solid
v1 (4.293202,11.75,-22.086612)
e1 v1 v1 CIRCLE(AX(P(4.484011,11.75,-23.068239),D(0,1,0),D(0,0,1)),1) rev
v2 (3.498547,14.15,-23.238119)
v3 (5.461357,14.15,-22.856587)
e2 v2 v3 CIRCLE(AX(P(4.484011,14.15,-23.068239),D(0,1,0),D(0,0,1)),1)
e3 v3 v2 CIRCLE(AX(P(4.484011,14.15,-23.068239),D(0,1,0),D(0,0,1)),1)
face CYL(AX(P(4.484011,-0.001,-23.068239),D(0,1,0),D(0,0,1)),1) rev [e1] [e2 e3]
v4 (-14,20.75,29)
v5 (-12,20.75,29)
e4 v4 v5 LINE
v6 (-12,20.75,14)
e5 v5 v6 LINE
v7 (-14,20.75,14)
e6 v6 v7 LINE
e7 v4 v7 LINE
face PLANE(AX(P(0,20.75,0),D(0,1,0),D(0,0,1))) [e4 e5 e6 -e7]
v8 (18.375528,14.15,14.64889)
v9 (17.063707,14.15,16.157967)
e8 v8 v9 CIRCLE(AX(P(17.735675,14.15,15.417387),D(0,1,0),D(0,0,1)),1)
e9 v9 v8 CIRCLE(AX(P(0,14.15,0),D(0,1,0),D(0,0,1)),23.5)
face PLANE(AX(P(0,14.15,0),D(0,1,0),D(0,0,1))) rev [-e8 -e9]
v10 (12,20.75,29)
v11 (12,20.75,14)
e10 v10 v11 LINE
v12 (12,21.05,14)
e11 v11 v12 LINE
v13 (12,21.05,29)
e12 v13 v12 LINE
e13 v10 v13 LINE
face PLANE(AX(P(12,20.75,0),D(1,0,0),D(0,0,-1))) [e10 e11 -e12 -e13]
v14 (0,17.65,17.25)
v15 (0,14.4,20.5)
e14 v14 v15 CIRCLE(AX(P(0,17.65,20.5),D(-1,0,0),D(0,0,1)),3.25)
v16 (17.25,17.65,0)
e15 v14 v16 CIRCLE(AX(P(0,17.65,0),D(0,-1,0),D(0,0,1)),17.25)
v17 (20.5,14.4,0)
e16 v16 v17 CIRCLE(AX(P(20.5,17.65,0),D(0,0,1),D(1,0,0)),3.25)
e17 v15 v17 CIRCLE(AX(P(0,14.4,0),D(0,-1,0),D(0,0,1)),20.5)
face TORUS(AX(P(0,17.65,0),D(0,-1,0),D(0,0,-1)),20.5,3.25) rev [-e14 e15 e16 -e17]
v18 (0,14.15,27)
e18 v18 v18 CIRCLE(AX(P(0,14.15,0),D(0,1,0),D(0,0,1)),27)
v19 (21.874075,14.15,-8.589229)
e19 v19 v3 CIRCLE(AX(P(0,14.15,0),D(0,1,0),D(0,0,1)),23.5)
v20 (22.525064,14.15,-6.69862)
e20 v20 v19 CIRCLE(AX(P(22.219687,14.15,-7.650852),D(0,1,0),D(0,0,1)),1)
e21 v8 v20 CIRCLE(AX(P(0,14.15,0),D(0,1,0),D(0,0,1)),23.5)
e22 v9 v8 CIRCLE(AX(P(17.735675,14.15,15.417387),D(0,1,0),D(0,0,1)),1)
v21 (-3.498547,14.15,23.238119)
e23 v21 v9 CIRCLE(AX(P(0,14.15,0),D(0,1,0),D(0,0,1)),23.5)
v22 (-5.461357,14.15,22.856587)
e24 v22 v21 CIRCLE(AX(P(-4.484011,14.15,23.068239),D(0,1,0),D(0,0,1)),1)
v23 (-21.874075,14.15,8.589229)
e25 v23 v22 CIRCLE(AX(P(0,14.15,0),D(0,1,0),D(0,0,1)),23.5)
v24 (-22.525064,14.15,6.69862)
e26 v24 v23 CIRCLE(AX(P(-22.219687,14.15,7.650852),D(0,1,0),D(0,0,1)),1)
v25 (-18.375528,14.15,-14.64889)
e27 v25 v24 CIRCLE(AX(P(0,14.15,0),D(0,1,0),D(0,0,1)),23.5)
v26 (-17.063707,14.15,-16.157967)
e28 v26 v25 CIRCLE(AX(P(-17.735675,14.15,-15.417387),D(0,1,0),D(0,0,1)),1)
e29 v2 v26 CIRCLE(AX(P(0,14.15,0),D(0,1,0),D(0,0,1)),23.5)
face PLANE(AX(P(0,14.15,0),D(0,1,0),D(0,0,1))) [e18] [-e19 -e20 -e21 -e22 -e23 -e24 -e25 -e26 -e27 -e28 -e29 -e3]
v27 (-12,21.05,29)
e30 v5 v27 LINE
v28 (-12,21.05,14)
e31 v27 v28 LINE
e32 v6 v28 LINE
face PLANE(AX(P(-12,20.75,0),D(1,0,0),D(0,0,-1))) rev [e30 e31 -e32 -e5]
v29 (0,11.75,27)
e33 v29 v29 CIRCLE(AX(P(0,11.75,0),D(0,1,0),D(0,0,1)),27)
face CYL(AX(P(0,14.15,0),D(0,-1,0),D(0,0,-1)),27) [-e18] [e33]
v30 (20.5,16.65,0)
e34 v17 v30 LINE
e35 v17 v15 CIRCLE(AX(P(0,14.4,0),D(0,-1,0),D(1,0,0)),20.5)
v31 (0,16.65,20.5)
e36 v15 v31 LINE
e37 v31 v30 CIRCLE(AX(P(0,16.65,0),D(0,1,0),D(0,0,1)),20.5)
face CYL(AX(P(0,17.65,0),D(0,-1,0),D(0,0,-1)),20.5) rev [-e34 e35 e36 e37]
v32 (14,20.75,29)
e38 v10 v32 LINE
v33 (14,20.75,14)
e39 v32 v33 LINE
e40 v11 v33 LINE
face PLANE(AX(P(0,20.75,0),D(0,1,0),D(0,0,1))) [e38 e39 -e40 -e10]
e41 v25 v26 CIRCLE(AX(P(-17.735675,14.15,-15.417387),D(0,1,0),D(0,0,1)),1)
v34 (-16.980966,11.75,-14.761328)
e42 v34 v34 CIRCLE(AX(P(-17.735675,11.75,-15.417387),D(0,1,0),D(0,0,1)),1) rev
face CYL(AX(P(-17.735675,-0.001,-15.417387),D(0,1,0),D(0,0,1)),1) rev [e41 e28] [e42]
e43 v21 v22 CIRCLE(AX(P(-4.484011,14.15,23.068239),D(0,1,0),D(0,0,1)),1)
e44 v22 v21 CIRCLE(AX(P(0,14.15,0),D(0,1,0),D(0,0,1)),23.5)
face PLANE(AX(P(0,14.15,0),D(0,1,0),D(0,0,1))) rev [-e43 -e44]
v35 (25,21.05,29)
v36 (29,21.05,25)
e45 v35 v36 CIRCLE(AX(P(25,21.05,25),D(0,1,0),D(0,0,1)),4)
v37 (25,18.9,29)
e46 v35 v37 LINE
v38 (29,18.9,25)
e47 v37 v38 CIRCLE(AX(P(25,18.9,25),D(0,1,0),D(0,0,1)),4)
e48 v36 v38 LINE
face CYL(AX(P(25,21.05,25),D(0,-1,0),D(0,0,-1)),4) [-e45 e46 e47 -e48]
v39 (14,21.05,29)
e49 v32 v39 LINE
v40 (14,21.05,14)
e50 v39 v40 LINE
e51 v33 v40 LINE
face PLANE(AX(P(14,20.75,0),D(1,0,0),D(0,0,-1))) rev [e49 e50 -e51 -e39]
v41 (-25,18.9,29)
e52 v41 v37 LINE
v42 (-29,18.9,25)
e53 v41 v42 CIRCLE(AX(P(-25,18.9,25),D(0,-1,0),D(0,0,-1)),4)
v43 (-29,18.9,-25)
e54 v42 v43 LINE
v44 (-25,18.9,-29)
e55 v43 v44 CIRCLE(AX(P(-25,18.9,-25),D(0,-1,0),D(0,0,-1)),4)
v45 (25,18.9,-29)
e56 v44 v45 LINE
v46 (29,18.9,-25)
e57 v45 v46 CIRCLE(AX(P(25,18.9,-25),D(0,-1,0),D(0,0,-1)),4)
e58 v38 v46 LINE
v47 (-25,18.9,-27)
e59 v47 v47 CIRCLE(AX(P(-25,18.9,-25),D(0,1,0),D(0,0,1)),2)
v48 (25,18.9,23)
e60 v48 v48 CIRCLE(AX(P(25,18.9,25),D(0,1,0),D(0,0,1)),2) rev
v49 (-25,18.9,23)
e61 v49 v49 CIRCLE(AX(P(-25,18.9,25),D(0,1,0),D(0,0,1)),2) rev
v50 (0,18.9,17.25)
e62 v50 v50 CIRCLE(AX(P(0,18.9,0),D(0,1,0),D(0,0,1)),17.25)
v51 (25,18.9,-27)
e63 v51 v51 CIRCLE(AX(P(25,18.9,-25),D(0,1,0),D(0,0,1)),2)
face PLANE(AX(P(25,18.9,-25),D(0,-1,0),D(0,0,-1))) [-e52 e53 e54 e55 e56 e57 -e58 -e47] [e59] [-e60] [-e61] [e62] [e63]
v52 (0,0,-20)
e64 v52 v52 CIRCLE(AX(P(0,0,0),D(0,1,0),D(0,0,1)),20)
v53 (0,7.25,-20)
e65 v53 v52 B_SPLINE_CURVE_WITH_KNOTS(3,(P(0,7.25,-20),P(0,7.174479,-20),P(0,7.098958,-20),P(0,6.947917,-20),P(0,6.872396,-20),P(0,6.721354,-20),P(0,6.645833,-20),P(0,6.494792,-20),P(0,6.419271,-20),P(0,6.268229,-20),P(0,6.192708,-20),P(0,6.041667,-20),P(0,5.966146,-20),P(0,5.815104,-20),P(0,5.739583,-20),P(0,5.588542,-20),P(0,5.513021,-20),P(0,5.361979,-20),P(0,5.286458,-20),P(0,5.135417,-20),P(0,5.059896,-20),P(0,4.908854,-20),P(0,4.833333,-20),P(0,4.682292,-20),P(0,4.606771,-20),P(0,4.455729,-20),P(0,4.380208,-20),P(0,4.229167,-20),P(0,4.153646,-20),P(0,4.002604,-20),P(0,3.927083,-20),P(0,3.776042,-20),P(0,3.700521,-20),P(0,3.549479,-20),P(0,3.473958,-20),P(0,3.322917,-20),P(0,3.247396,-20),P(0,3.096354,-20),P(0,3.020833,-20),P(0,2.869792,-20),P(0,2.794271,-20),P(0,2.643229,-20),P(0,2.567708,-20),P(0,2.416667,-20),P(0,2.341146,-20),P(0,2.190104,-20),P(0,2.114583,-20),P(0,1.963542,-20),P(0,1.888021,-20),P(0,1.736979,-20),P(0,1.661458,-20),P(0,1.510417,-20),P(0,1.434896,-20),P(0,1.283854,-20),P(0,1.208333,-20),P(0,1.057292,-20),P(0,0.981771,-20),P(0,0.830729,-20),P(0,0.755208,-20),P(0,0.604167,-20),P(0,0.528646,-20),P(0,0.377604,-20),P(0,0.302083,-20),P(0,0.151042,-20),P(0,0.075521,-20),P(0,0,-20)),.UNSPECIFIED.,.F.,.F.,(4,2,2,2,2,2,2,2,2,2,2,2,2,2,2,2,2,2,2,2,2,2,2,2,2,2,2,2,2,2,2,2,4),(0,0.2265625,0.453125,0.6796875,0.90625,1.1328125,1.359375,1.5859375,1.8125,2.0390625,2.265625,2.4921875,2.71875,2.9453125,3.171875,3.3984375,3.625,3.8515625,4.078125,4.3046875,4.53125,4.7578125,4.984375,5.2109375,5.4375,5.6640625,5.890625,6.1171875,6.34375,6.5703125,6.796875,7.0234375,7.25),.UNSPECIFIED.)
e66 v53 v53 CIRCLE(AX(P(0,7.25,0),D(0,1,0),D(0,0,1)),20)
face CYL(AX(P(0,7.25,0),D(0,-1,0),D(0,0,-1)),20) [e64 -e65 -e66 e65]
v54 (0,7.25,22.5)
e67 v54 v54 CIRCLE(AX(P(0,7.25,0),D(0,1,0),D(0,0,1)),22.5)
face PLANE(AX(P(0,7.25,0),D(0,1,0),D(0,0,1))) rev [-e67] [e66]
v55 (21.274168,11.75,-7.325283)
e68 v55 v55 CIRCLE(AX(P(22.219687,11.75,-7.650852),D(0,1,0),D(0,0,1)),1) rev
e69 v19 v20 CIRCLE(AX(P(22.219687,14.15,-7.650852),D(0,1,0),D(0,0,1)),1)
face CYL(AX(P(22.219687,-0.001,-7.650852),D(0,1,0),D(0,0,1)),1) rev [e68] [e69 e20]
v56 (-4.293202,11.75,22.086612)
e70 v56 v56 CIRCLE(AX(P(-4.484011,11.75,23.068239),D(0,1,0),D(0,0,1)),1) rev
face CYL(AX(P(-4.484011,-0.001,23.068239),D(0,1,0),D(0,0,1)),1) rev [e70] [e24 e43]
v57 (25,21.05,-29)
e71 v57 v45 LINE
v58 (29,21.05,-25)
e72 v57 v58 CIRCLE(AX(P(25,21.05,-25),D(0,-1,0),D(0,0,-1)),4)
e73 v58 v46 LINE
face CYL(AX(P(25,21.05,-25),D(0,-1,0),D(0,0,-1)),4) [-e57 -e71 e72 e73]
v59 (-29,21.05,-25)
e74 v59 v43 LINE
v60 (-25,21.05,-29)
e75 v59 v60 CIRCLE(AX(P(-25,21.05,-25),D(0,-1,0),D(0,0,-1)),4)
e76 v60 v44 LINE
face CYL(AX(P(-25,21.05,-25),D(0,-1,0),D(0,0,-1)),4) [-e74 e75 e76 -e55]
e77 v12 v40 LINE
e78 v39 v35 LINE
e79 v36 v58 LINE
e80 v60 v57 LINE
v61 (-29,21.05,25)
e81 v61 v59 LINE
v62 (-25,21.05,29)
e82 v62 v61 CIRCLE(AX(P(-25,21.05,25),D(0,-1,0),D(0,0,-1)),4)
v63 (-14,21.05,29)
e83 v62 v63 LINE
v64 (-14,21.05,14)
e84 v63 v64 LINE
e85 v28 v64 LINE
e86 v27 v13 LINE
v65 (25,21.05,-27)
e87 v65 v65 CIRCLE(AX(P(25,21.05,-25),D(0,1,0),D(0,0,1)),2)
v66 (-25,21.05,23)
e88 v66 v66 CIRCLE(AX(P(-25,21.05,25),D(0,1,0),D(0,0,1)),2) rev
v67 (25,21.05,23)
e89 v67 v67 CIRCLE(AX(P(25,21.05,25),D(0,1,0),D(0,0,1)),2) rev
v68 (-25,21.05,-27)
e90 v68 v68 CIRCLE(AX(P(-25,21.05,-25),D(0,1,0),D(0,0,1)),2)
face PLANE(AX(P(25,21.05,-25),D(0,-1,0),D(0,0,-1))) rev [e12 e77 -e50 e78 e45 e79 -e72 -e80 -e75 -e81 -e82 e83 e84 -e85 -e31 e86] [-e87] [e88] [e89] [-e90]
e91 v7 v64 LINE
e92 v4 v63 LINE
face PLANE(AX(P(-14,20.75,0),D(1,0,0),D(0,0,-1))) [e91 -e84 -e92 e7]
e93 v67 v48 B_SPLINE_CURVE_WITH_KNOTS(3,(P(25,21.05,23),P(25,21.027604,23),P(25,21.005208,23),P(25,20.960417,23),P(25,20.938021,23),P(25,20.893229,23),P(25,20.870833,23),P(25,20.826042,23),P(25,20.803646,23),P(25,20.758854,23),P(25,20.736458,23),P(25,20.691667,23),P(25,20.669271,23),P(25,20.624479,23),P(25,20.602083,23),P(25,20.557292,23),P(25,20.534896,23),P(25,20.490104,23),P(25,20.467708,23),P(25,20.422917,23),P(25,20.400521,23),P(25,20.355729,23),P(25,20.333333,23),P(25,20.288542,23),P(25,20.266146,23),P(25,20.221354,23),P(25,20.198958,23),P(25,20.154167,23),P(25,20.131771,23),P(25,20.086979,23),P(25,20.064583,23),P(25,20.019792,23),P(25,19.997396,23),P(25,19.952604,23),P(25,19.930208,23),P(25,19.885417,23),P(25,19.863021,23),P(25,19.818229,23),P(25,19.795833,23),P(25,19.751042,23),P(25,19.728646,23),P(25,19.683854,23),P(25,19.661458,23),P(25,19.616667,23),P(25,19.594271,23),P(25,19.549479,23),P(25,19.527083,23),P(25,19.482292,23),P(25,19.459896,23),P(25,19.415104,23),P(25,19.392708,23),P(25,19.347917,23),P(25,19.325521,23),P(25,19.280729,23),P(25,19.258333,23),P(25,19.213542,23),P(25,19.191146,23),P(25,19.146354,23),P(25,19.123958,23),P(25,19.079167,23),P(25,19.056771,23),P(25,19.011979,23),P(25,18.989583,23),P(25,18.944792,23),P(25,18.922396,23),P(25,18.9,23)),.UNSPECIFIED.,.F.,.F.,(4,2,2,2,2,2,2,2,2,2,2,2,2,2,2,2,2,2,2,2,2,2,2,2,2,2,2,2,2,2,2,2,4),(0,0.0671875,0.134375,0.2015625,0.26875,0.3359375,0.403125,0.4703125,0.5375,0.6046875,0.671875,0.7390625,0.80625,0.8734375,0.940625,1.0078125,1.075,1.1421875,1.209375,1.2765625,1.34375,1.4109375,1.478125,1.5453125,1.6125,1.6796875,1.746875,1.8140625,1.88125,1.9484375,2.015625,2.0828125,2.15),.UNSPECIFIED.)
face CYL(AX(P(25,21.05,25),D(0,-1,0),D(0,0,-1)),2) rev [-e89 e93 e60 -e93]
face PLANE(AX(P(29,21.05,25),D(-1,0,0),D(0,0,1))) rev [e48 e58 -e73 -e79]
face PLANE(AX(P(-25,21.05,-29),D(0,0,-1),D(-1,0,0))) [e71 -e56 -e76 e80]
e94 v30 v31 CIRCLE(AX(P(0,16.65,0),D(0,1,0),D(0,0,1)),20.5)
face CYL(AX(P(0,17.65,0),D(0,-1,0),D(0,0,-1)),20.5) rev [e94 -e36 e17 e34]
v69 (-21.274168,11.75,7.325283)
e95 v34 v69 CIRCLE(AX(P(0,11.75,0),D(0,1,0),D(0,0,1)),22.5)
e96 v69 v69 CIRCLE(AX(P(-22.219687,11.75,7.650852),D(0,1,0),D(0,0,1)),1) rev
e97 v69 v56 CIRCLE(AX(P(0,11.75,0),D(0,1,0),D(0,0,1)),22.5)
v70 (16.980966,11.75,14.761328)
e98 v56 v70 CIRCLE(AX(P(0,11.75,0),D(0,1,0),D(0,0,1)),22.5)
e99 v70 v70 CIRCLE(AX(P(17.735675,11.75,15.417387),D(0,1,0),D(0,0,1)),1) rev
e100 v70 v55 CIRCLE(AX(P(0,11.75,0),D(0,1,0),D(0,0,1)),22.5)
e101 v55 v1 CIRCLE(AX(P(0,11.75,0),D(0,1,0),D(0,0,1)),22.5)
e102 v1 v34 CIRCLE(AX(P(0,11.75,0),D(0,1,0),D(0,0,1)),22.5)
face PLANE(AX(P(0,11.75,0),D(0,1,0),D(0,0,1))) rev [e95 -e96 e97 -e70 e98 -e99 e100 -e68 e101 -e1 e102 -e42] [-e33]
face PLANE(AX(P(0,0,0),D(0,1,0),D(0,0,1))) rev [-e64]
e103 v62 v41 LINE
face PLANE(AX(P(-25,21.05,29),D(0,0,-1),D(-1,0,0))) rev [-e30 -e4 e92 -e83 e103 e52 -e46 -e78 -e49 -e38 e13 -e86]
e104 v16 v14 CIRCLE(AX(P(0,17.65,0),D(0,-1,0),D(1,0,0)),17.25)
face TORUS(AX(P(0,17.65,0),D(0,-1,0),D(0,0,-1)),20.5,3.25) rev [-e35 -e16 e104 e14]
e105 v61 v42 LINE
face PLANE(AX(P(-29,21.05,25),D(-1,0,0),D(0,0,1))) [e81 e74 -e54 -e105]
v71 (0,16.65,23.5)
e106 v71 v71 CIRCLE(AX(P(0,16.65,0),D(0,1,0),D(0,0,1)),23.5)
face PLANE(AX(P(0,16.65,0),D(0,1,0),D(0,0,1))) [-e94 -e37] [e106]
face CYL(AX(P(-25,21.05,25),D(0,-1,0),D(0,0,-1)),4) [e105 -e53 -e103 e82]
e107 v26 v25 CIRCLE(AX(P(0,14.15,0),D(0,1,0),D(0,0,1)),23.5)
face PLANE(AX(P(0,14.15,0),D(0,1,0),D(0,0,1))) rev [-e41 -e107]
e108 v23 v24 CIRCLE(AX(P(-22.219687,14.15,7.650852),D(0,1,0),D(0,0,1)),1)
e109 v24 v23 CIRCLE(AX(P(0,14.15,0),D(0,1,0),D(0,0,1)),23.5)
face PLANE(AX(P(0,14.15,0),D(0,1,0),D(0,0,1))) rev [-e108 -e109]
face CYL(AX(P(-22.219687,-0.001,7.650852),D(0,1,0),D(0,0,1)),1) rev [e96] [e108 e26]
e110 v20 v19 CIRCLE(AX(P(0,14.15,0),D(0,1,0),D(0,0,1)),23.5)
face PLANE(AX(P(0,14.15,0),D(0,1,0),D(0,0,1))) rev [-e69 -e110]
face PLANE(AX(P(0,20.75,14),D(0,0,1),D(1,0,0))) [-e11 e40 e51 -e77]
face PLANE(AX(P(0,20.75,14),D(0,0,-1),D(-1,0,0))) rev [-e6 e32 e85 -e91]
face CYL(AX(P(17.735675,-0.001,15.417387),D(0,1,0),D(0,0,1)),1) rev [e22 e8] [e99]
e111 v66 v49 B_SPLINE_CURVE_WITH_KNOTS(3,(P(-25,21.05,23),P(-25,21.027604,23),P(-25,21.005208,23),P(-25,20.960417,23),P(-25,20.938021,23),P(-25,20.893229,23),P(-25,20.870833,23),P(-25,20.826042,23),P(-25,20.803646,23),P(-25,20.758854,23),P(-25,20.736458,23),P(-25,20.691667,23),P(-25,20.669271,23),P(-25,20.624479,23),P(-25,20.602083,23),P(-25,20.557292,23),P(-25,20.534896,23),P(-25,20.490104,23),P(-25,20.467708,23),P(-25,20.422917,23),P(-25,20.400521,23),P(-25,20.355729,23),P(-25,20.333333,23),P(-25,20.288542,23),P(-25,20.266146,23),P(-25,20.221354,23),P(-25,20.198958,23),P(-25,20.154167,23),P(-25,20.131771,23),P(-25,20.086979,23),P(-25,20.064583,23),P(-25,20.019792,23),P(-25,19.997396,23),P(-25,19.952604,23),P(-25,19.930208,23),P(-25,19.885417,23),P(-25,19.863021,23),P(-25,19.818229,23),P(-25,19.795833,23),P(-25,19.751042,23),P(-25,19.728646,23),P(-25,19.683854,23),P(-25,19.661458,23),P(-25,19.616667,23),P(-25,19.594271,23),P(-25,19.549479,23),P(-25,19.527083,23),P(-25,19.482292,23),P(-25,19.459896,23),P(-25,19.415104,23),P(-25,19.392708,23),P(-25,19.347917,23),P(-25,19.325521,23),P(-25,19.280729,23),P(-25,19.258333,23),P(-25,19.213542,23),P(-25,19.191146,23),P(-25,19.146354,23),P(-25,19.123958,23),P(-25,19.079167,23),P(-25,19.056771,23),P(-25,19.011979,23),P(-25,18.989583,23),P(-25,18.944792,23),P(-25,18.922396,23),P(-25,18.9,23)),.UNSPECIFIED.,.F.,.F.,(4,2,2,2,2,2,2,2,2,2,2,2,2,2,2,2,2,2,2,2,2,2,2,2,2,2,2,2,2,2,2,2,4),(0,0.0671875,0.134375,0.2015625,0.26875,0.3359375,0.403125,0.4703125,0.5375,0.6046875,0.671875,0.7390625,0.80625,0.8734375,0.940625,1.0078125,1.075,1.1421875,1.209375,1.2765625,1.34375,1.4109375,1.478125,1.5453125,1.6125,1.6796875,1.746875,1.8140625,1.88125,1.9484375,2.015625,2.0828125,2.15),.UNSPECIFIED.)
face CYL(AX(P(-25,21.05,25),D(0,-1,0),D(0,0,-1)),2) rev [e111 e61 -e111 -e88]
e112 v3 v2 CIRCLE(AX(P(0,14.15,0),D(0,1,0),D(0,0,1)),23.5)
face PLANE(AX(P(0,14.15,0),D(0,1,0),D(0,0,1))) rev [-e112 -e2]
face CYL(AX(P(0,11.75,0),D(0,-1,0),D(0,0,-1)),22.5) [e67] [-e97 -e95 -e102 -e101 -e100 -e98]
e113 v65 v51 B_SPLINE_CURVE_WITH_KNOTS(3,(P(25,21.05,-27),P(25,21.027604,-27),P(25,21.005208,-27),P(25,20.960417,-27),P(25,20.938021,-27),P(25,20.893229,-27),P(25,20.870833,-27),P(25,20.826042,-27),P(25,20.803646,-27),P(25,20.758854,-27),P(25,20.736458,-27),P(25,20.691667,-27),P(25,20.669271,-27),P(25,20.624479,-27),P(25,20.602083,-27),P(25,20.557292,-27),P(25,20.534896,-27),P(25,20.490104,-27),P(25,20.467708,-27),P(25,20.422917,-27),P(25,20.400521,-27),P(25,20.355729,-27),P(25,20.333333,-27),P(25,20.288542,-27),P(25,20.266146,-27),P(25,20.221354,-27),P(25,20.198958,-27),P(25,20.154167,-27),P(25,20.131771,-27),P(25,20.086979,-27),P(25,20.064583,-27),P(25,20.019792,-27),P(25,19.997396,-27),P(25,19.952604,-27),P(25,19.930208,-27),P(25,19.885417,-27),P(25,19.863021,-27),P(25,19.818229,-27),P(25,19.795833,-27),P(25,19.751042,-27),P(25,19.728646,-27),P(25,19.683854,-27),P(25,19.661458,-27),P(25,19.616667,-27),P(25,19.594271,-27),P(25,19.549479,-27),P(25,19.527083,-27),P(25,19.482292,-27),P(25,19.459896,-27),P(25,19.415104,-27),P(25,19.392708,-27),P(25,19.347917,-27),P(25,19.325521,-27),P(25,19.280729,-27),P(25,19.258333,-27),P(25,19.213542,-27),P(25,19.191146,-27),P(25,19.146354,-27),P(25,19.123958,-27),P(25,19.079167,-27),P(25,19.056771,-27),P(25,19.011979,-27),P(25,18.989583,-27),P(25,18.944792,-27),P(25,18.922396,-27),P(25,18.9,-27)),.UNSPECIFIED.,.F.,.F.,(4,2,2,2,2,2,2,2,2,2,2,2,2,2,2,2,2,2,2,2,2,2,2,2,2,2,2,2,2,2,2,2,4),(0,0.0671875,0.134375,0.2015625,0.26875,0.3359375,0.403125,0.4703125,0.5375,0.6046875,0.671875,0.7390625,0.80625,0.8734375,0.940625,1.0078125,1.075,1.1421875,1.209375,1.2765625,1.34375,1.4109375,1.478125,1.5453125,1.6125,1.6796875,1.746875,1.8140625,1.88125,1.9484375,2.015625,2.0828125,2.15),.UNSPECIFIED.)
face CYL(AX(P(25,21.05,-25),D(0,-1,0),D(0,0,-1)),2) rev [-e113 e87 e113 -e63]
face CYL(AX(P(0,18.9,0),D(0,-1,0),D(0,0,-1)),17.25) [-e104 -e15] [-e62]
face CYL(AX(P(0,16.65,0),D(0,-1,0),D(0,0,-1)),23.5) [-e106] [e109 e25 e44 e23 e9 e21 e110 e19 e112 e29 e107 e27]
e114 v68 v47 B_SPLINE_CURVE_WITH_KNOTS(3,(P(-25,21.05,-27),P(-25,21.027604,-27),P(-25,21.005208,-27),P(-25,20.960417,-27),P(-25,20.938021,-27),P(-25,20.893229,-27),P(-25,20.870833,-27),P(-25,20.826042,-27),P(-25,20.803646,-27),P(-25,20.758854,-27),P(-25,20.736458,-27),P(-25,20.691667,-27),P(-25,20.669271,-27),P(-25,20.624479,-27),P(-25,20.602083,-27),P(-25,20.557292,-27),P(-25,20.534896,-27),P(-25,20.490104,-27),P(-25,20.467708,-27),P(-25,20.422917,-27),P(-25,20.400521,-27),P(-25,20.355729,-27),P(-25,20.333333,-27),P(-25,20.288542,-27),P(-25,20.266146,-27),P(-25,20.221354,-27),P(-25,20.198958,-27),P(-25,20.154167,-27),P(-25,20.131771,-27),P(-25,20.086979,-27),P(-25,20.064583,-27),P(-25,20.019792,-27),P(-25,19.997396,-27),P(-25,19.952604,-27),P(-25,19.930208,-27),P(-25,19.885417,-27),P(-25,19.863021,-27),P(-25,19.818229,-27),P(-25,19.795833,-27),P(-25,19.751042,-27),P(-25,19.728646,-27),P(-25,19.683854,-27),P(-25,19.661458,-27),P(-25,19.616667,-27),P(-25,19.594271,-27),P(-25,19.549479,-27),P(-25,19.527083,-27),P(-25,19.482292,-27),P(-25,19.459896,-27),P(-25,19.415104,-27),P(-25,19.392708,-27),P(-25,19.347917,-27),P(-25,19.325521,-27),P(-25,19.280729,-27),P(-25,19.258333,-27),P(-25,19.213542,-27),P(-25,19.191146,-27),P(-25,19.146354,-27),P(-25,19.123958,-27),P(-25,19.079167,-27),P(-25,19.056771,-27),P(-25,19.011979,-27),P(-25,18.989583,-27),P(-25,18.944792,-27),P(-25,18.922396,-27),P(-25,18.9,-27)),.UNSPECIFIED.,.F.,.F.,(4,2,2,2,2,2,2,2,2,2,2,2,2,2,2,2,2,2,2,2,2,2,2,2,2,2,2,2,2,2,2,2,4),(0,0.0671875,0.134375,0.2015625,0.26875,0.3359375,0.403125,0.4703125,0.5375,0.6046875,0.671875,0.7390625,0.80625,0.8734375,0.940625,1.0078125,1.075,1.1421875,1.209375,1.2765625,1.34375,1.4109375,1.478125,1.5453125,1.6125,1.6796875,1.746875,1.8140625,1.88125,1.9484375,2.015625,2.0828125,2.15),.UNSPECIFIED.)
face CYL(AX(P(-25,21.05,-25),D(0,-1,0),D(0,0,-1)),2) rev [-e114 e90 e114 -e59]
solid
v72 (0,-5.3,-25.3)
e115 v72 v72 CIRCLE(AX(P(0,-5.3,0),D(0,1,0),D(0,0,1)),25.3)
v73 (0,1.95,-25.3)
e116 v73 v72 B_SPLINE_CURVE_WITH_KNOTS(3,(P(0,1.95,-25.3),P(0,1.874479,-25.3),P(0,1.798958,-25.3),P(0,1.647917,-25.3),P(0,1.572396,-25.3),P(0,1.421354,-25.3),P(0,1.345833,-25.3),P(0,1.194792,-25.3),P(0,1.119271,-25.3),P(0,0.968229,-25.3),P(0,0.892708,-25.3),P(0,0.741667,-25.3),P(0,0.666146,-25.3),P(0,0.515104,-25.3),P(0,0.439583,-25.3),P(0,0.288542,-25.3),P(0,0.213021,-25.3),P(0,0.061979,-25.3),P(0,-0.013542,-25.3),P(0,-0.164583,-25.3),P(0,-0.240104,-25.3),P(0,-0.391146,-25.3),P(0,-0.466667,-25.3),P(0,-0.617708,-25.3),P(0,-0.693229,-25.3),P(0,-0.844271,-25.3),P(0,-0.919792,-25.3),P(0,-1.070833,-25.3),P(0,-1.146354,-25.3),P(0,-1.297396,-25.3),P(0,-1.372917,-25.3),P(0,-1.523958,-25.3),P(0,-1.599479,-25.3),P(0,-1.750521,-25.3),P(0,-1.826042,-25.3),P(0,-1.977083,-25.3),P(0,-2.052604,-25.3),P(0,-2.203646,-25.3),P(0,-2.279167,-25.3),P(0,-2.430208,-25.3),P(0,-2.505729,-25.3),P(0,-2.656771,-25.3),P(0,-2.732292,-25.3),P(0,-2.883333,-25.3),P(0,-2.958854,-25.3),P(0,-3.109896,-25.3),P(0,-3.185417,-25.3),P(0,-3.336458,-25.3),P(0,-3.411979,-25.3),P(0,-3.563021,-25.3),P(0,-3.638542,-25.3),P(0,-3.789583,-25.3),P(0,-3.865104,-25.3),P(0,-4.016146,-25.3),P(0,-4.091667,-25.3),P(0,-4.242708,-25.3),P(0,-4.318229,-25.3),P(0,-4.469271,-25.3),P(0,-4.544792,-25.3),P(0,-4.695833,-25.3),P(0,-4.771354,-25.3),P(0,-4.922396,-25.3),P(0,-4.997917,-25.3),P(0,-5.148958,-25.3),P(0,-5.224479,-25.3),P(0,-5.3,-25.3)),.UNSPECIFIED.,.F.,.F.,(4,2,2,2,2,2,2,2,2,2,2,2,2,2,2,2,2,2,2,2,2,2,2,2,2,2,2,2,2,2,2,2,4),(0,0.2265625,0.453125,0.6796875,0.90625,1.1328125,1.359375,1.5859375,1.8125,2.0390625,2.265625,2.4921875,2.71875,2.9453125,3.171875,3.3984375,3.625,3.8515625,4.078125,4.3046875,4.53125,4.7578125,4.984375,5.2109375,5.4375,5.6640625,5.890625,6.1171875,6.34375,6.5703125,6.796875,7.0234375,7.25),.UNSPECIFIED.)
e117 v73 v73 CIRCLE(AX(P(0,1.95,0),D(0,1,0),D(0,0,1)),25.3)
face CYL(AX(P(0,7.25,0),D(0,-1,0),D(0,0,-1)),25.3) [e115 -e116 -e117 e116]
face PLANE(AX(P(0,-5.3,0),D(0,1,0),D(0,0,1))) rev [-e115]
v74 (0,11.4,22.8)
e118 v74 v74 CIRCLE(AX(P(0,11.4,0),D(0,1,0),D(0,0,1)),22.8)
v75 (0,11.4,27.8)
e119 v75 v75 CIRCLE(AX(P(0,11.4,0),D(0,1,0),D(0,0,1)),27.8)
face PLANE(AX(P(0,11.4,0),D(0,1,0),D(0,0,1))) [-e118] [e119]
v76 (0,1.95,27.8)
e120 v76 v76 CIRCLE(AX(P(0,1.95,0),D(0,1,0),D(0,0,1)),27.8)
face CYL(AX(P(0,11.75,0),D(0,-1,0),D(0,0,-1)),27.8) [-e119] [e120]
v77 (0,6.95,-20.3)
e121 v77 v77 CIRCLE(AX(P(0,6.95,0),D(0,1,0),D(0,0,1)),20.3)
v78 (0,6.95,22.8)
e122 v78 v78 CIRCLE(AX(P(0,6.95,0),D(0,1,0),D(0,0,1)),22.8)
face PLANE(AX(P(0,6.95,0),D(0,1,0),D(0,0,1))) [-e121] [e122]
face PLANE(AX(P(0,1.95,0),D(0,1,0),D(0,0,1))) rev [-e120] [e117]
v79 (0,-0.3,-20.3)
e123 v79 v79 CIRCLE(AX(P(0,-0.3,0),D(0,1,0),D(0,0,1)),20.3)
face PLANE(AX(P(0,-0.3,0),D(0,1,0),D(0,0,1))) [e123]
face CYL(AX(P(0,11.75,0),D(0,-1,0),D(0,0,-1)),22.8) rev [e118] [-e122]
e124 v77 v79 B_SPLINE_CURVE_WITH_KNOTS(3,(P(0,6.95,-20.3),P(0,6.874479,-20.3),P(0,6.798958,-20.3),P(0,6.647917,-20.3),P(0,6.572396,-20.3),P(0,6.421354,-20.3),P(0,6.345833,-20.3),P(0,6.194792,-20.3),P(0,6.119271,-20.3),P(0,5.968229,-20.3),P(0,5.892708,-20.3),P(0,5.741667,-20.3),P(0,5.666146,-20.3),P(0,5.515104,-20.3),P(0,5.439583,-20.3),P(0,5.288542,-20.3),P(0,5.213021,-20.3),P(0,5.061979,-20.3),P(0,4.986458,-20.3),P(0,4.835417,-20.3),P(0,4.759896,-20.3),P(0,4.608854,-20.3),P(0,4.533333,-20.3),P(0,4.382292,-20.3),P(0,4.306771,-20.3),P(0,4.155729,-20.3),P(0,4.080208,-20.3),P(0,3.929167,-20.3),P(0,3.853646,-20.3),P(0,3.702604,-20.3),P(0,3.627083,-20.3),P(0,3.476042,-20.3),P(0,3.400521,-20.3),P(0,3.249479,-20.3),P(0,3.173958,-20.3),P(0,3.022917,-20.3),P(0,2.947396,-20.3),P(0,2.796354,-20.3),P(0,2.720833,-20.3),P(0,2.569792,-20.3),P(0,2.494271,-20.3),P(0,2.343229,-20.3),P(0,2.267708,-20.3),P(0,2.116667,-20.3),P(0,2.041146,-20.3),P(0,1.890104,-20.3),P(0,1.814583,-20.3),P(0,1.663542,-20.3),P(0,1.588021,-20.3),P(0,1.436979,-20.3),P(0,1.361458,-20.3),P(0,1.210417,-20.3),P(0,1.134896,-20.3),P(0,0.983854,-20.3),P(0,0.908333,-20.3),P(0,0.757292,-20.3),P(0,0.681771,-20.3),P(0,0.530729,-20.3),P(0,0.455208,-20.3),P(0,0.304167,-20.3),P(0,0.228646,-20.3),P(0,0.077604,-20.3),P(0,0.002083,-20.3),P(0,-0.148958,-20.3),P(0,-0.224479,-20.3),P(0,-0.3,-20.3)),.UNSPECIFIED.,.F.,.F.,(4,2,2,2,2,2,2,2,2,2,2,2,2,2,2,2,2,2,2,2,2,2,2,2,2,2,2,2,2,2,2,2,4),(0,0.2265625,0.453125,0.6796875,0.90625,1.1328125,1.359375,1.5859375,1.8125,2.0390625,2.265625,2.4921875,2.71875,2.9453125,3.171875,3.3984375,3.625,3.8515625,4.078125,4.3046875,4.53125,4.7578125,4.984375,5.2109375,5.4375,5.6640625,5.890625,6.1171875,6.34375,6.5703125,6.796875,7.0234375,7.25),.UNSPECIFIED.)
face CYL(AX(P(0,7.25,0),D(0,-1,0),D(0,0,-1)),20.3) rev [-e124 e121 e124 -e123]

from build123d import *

# Parameters (mm, degrees)
SKETCH1_R              = 20
BOSS_EXTRUDE1_DEPTH    = 7.25
SKETCH2_R              = 22.5
BOSS_EXTRUDE2_DEPTH    = 4.5
SKETCH3_R              = 27
BOSS_EXTRUDE3_DEPTH    = 2.4
CUT_EXTRUDE1_REACH     = 42.721
SKETCH4_R              = 1
SKETCH5_R              = 23.5
BOSS_EXTRUDE4_DEPTH    = 2.5
SKETCH6_R              = 20.5
BOSS_EXTRUDE5_DEPTH    = 1
SKETCH8_R              = 17.25
BOSS_EXTRUDE8_DEPTH    = 1.25
SKETCH10_R             = 2
BOSS_EXTRUDE10_DEPTH   = 2.15
SKETCH11_W             = 2
SKETCH11_H             = 15
CUT_EXTRUDE2_DEPTH     = 0.3
THICKEN1_START         = -5.3
THICKEN1_OUTLINE_R     = 25.3
THICKEN1_DEPTH         = 5
THICKEN1_START_2       = 1.95
THICKEN1_2_OUTLINE_R   = 27.8
THICKEN1_2_OUTLINE_R_2 = 22.8
THICKEN1_2_DEPTH       = 9.8
THICKEN1_START_3       = -0.3
THICKEN1_3_OUTLINE_R   = 25.3
THICKEN1_3_OUTLINE_R_2 = 20.3
THICKEN1_3_DEPTH       = 7.25
SKETCH12_R             = 27.8
SKETCH12_R_2           = 22.8
CUT_EXTRUDE3_DEPTH     = 0.35


# Read off the part's stored shape, not the designer's step: Thicken1
with BuildPart() as part:
    # Sketch1 → Boss-Extrude1 (new body)
    with BuildSketch(Plane(origin=(0, 0, 0), x_dir=(1, 0, 0), z_dir=(0, 1, 0))):
        with Locations(Location((0, 0, 0), (0, 0, 90))):
            Circle(SKETCH1_R)
    extrude(amount=BOSS_EXTRUDE1_DEPTH)

    # Sketch2 → Boss-Extrude2 (add)
    with BuildSketch(Plane(origin=(0, 7.25, 0), x_dir=(1, 0, 0), z_dir=(0, 1, 0))):
        with Locations(Location((0, 0, 0), (0, 0, 270))):
            Circle(SKETCH2_R)
    extrude(amount=BOSS_EXTRUDE2_DEPTH)

    # Sketch3 → Boss-Extrude3 (add)
    with BuildSketch(Plane(origin=(0, 11.75, 0), x_dir=(1, 0, 0), z_dir=(0, 1, 0))):
        with Locations(Location((0, 0, 0), (0, 0, 270))):
            Circle(SKETCH3_R)
    extrude(amount=BOSS_EXTRUDE3_DEPTH)

    # Sketch4 → Cut-Extrude1 (cut, up to next)
    with BuildSketch(Plane(origin=(0, 14.15, 0), x_dir=(1, 0, 0), z_dir=(0, 1, 0)), mode=Mode.PRIVATE) as cut_extrude1_sk1:
        with Locations(Location((17.735675135, -15.417387181, 0), (0, 0, 270))):
            Circle(SKETCH4_R)
    cut_extrude1_tool1 = extrude(cut_extrude1_sk1.sketch, amount=-CUT_EXTRUDE1_REACH, mode=Mode.PRIVATE) & part.part
    # Sketch4 → Cut-Extrude1 (cut, up to next)
    with BuildSketch(Plane(origin=(0, 14.15, 0), x_dir=(1, 0, 0), z_dir=(0, 1, 0)), mode=Mode.PRIVATE) as cut_extrude1_sk2:
        with Locations(Location((-4.484011391, -23.068238811, 0), (0, 0, 270))):
            Circle(SKETCH4_R)
    cut_extrude1_tool2 = extrude(cut_extrude1_sk2.sketch, amount=-CUT_EXTRUDE1_REACH, mode=Mode.PRIVATE) & part.part
    # Sketch4 → Cut-Extrude1 (cut, up to next)
    with BuildSketch(Plane(origin=(0, 14.15, 0), x_dir=(1, 0, 0), z_dir=(0, 1, 0)), mode=Mode.PRIVATE) as cut_extrude1_sk3:
        with Locations(Location((-22.219686527, -7.65085163, 0), (0, 0, 270))):
            Circle(SKETCH4_R)
    cut_extrude1_tool3 = extrude(cut_extrude1_sk3.sketch, amount=-CUT_EXTRUDE1_REACH, mode=Mode.PRIVATE) & part.part
    # Sketch4 → Cut-Extrude1 (cut, up to next)
    with BuildSketch(Plane(origin=(0, 14.15, 0), x_dir=(1, 0, 0), z_dir=(0, 1, 0)), mode=Mode.PRIVATE) as cut_extrude1_sk4:
        with Locations(Location((-17.735675135, 15.417387181, 0), (0, 0, 270))):
            Circle(SKETCH4_R)
    cut_extrude1_tool4 = extrude(cut_extrude1_sk4.sketch, amount=-CUT_EXTRUDE1_REACH, mode=Mode.PRIVATE) & part.part
    # Sketch4 → Cut-Extrude1 (cut, up to next)
    with BuildSketch(Plane(origin=(0, 14.15, 0), x_dir=(1, 0, 0), z_dir=(0, 1, 0)), mode=Mode.PRIVATE) as cut_extrude1_sk5:
        with Locations(Location((4.484011391, 23.068238811, 0), (0, 0, 270))):
            Circle(SKETCH4_R)
    cut_extrude1_tool5 = extrude(cut_extrude1_sk5.sketch, amount=-CUT_EXTRUDE1_REACH, mode=Mode.PRIVATE) & part.part
    # Sketch4 → Cut-Extrude1 (cut, up to next)
    with BuildSketch(Plane(origin=(0, 14.15, 0), x_dir=(1, 0, 0), z_dir=(0, 1, 0)), mode=Mode.PRIVATE) as cut_extrude1_sk6:
        with Locations(Location((22.219686527, 7.65085163, 0), (0, 0, 270))):
            Circle(SKETCH4_R)
    cut_extrude1_tool6 = extrude(cut_extrude1_sk6.sketch, amount=-CUT_EXTRUDE1_REACH, mode=Mode.PRIVATE) & part.part
    add(cut_extrude1_tool1.solids().sort_by_distance((17.735675, 14.15, 15.417387))[0], mode=Mode.SUBTRACT)
    add(cut_extrude1_tool2.solids().sort_by_distance((-4.484011, 14.15, 23.068239))[0], mode=Mode.SUBTRACT)
    add(cut_extrude1_tool3.solids().sort_by_distance((-22.219687, 14.15, 7.650852))[0], mode=Mode.SUBTRACT)
    add(cut_extrude1_tool4.solids().sort_by_distance((-17.735675, 14.15, -15.417387))[0], mode=Mode.SUBTRACT)
    add(cut_extrude1_tool5.solids().sort_by_distance((4.484011, 14.15, -23.068239))[0], mode=Mode.SUBTRACT)
    add(cut_extrude1_tool6.solids().sort_by_distance((22.219687, 14.15, -7.650852))[0], mode=Mode.SUBTRACT)

    # Sketch5 → Boss-Extrude4 (add)
    with BuildSketch(Plane(origin=(0, 14.15, 0), x_dir=(1, 0, 0), z_dir=(0, 1, 0))):
        with Locations(Location((0, 0, 0), (0, 0, 81.438302268))):
            Circle(SKETCH5_R)
    extrude(amount=BOSS_EXTRUDE4_DEPTH)

    # Sketch6 → Boss-Extrude5 (add)
    with BuildSketch(Plane(origin=(0, 16.65, 0), x_dir=(1, 0, 0), z_dir=(0, 1, 0))):
        with Locations(Location((0, 0, 0), (0, 0, 270))):
            Circle(SKETCH6_R)
    extrude(amount=BOSS_EXTRUDE5_DEPTH)

    # Cut-Sweep1: sweep along a curve in space
    with BuildLine() as cut_sweep1_path:
        ThreePointArc((0, 17.65, 20.5), (14.495689014, 17.65, 14.495689014), (20.5, 17.65, 0))
        ThreePointArc((20.5, 17.65, 0), (14.495689014, 17.65, -14.495689014), (0, 17.65, -20.5))
        ThreePointArc((0, 17.65, -20.5), (-14.495689014, 17.65, -14.495689014), (-20.5, 17.65, 0))
        ThreePointArc((-20.5, 17.65, 0), (-14.495689014, 17.65, 14.495689014), (0, 17.65, 20.5))
    # Sketch7 → Cut-Sweep1 (sweep, cut)
    with BuildSketch(Plane.XY):
        with BuildLine():
            Line((20.5, 17.65), (20.5, 14.4))
            ThreePointArc((20.5, 14.4), (18.201902961, 15.351902961), (17.25, 17.65))
            Line((17.25, 17.65), (20.5, 17.65))
        make_face()
    sweep(path=cut_sweep1_path.line, mode=Mode.SUBTRACT)

    # Sketch8 → Boss-Extrude8 (add)
    with BuildSketch(Plane(origin=(0, 17.65, 0), x_dir=(1, 0, 0), z_dir=(0, 1, 0))):
        with Locations(Location((0, 0, 0), (0, 0, 270))):
            Circle(SKETCH8_R)
    extrude(amount=BOSS_EXTRUDE8_DEPTH)

    # Sketch10 → Boss-Extrude10 (add)
    with BuildSketch(Plane(origin=(0, 18.9, 0), x_dir=(1, 0, 0), z_dir=(0, 1, 0))):
        with BuildLine():
            Line((-25, -29), (25, -29))
            ThreePointArc((25, -29), (27.828427125, -27.828427125), (29, -25))
            Line((29, -25), (29, 25))
            ThreePointArc((29, 25), (27.828427125, 27.828427125), (25, 29))
            Line((25, 29), (-25, 29))
            ThreePointArc((-25, 29), (-27.828427125, 27.828427125), (-29, 25))
            Line((-29, 25), (-29, -25))
            ThreePointArc((-29, -25), (-27.828427125, -27.828427125), (-25, -29))
        make_face()
        with Locations(Location((-25, 25, 0), (0, 0, 90))):
            Circle(SKETCH10_R, mode=Mode.SUBTRACT)
        with Locations(Location((25, 25, 0), (0, 0, 90))):
            Circle(SKETCH10_R, mode=Mode.SUBTRACT)
        with Locations(Location((25, -25, 0), (0, 0, 90))):
            Circle(SKETCH10_R, mode=Mode.SUBTRACT)
        with Locations(Location((-25, -25, 0), (0, 0, 90))):
            Circle(SKETCH10_R, mode=Mode.SUBTRACT)
    extrude(amount=BOSS_EXTRUDE10_DEPTH)

    # Sketch11 → Cut-Extrude2 (cut)
    with BuildSketch(Plane(origin=(0, 21.05, 0), x_dir=(1, 0, 0), z_dir=(0, 1, 0))):
        with Locations((-13, -21.5)):
            Rectangle(SKETCH11_W, SKETCH11_H)
        with Locations((13, -21.5)):
            Rectangle(SKETCH11_W, SKETCH11_H)
    extrude(amount=-CUT_EXTRUDE2_DEPTH, mode=Mode.SUBTRACT)


with BuildPart() as body_2:
    # Thicken1 outline → Thicken1 (new body)
    with BuildSketch(Plane(origin=(0, 0, 0), x_dir=(1, 0, 0), z_dir=(0, 1, 0)).offset(THICKEN1_START)):
        Circle(THICKEN1_OUTLINE_R)
    extrude(amount=THICKEN1_DEPTH)



with BuildPart() as body_3:
    # Thicken1 2 outline → Thicken1 2 (new body)
    with BuildSketch(Plane(origin=(0, 0, 0), x_dir=(1, 0, 0), z_dir=(0, 1, 0)).offset(THICKEN1_START_2)):
        Circle(THICKEN1_2_OUTLINE_R)
        Circle(THICKEN1_2_OUTLINE_R_2, mode=Mode.SUBTRACT)
    extrude(amount=THICKEN1_2_DEPTH)


with BuildPart() as body_2_1:
    add(body_2.part)

    add(body_3.part)  # Thicken1 3 merges body 3
    # Thicken1 3 outline → Thicken1 3 (add)
    with BuildSketch(Plane(origin=(0, 0, 0), x_dir=(1, 0, 0), z_dir=(0, 1, 0)).offset(THICKEN1_START_3)):
        Circle(THICKEN1_3_OUTLINE_R)
        Circle(THICKEN1_3_OUTLINE_R_2, mode=Mode.SUBTRACT)
    extrude(amount=THICKEN1_3_DEPTH)

    # Sketch12 → Cut-Extrude3 (cut)
    with BuildSketch(Plane(origin=(0, 11.75, 0), x_dir=(1, 0, 0), z_dir=(0, 1, 0))):
        with Locations(Location((0, 0, 0), (0, 0, 270))):
            Circle(SKETCH12_R)
        with Locations(Location((0, 0, 0), (0, 0, 270))):
            Circle(SKETCH12_R_2, mode=Mode.SUBTRACT)
    extrude(amount=-CUT_EXTRUDE3_DEPTH, mode=Mode.SUBTRACT)


solid = Compound([part.part, body_2_1.part])
